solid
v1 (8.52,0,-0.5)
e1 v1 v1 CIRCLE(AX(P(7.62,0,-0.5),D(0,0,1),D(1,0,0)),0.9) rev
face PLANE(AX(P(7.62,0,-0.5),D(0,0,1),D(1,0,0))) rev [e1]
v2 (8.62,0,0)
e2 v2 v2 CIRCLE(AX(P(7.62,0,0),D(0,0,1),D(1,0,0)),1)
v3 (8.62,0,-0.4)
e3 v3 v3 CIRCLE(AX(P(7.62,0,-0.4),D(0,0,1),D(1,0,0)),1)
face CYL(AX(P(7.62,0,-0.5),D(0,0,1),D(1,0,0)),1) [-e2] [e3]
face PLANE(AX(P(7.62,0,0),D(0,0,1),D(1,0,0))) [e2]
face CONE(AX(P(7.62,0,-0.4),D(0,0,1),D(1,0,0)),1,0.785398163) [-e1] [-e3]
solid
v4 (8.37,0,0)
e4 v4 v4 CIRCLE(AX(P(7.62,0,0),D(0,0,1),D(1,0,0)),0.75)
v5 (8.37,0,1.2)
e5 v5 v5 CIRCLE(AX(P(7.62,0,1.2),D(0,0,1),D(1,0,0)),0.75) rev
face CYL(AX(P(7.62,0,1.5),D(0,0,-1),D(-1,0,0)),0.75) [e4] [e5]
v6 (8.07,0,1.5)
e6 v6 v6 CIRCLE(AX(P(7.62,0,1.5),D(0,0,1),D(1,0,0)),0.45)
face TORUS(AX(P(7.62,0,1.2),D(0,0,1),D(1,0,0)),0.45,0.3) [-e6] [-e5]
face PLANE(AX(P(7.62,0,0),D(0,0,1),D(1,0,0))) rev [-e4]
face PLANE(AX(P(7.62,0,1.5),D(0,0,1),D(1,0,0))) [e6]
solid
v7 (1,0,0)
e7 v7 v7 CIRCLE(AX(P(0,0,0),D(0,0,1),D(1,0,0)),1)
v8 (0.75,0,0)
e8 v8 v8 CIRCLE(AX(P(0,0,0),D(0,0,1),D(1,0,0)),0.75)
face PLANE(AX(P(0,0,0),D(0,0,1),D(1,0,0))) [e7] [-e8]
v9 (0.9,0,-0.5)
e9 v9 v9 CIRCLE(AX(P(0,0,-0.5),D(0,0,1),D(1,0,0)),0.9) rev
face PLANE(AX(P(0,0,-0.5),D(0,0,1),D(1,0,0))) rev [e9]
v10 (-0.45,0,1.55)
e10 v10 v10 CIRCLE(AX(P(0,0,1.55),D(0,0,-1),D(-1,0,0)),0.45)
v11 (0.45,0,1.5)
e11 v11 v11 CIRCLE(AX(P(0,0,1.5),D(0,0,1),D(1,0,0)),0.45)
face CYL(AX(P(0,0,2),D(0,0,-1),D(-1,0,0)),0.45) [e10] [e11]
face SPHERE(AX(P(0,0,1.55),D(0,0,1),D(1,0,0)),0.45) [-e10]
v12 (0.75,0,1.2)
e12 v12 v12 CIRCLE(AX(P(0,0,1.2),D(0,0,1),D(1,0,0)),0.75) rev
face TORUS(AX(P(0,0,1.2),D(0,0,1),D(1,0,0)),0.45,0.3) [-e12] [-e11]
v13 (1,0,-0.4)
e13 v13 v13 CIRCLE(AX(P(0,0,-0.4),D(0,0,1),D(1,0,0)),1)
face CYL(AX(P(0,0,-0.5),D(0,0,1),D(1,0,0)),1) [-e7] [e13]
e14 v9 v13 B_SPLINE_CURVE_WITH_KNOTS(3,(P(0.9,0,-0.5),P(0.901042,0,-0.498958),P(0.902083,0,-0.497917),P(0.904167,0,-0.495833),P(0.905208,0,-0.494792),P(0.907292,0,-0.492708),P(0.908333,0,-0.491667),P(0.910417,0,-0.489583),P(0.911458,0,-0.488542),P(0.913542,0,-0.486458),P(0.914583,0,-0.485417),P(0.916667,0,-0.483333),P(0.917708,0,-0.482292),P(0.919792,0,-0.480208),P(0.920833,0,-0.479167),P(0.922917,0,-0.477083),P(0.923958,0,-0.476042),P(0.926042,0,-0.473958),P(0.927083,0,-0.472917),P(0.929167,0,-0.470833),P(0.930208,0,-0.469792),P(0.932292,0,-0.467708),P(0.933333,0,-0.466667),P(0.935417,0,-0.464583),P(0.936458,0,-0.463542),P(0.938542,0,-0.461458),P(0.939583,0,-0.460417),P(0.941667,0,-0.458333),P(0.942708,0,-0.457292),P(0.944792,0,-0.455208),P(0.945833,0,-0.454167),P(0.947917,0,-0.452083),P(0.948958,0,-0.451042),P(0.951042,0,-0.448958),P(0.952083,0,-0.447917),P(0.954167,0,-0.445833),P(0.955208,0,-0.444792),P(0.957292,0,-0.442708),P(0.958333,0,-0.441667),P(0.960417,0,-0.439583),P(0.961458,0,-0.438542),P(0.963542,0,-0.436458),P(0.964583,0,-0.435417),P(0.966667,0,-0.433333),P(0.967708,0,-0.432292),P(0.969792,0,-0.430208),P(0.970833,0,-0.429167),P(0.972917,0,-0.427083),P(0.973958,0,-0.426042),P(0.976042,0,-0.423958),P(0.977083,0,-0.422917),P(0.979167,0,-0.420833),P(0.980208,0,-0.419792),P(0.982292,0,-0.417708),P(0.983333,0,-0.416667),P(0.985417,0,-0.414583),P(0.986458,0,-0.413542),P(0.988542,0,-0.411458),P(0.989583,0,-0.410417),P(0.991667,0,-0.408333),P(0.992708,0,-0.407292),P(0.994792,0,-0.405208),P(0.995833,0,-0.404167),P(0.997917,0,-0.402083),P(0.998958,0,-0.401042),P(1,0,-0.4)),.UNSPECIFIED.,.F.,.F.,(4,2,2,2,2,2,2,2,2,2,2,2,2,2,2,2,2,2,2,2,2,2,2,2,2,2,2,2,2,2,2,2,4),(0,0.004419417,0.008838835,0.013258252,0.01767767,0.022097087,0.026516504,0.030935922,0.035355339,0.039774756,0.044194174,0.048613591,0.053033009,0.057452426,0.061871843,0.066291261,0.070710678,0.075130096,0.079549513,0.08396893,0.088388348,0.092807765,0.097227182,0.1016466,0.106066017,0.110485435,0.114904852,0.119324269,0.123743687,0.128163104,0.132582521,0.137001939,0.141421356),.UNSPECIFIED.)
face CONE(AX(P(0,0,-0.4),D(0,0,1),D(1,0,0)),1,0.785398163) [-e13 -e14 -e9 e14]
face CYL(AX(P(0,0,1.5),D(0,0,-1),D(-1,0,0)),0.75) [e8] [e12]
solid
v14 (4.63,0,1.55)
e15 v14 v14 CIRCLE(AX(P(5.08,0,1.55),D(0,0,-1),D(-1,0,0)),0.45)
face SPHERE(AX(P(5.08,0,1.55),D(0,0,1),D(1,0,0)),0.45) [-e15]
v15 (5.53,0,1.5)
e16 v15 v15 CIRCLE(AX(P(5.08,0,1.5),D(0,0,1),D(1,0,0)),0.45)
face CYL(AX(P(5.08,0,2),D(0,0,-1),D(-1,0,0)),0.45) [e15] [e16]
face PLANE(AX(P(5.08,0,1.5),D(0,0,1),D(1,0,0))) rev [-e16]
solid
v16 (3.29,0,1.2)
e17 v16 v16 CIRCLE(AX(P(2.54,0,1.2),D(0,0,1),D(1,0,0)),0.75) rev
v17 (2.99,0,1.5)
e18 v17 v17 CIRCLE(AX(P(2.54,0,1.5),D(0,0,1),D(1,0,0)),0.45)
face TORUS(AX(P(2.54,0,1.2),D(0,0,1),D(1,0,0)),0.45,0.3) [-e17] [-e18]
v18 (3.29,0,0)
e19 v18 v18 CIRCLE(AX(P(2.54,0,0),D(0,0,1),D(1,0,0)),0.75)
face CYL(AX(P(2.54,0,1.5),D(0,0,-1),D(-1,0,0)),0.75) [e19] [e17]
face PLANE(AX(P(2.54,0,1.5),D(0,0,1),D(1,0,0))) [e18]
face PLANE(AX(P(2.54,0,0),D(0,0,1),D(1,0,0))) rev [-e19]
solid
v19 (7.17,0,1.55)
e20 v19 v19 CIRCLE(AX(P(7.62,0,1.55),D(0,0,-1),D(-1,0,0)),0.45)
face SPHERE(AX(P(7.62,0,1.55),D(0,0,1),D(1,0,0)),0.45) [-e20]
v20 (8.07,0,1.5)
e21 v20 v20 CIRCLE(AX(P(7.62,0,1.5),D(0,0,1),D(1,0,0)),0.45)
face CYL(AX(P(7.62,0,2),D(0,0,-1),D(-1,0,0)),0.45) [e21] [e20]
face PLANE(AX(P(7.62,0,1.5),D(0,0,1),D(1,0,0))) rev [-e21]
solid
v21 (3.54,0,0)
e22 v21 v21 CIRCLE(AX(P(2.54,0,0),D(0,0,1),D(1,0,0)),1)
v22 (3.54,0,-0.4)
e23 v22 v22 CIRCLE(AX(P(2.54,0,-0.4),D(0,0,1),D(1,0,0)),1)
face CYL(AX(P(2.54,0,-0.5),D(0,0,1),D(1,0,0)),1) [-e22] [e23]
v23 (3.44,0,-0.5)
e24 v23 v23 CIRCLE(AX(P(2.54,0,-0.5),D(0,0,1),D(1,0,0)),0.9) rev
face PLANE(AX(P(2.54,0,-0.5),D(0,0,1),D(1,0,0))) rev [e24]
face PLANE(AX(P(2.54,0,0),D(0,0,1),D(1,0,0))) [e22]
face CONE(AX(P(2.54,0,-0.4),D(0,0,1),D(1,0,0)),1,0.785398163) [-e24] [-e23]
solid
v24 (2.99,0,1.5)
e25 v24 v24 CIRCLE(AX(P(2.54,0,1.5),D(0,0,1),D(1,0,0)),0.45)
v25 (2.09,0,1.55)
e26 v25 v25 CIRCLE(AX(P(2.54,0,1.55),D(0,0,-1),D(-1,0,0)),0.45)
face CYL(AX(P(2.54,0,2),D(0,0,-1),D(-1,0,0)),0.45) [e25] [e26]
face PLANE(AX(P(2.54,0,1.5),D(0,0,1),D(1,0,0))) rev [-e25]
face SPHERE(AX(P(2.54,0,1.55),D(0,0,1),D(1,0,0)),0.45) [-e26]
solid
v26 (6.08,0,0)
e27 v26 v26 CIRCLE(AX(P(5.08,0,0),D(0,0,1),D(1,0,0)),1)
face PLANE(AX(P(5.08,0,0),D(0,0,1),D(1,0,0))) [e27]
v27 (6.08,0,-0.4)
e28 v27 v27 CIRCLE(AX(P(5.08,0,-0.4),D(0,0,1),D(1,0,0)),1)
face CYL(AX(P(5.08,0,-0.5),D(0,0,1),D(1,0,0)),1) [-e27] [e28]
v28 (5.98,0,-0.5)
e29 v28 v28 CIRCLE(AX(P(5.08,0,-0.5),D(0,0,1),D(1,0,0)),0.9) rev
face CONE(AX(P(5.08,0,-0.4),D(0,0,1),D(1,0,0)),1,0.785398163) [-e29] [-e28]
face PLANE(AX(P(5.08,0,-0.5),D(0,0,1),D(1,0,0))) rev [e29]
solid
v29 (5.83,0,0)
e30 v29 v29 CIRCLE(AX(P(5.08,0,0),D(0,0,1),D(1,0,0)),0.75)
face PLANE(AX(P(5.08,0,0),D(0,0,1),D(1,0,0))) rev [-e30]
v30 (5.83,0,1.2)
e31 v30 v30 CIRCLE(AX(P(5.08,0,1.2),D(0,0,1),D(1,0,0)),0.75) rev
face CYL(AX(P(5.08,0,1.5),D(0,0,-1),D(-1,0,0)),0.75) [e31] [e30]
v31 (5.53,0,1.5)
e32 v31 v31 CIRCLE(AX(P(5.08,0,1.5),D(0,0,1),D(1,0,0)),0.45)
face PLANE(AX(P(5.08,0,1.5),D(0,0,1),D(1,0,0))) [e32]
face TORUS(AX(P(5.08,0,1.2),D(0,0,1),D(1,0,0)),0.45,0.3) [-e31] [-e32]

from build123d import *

# Parameters (mm, degrees)
SKETCH_1_R        = 0.75
EXTRUDE_1_DEPTH   = 1.5
EXTRUDE_1_2_DEPTH = 1.5
EXTRUDE_1_3_DEPTH = 1.5
EXTRUDE_1_4_DEPTH = 1.5
SKETCH_2_R        = 1
EXTRUDE_2_DEPTH   = 0.5
SKETCH_3_R        = 0.45
EXTRUDE_3_DEPTH   = 0.5
FILLET_1_R        = 0.3
FILLET_2_R        = 0.45
CHAMFER_1_SIZE    = 0.1
CHAMFER_2_SIZE    = 0.1
CHAMFER_3_SIZE    = 0.1
CHAMFER_4_SIZE    = 0.1
FILLET_3_R        = 0.3
FILLET_4_R        = 0.3
FILLET_5_R        = 0.3
FILLET_6_R        = 0.45
FILLET_7_R        = 0.45
FILLET_8_R        = 0.45


with BuildPart() as part:
    # 草图1 → 凸台-拉伸1 (new body)
    with BuildSketch(Plane.XY):
        Circle(SKETCH_1_R)
    extrude(amount=EXTRUDE_1_DEPTH)

    # 草图2 → 凸台-拉伸2 (add)
    with BuildSketch(Plane.XY):
        Circle(SKETCH_2_R)
        with Locations((2.54, 0)):
            Circle(SKETCH_2_R)
        with Locations((5.08, 0)):
            Circle(SKETCH_2_R)
        with Locations((7.62, 0)):
            Circle(SKETCH_2_R)
    extrude(amount=-EXTRUDE_2_DEPTH)


with BuildPart() as body_2:
    # 草图1 → Extrude 1 2 (new body)
    with BuildSketch(Plane.XY):
        with Locations((2.54, 0)):
            Circle(SKETCH_1_R)
    extrude(amount=EXTRUDE_1_2_DEPTH)

    # 圆角3
    fillet_3_edges = [body_2.edges().sort_by_distance(p)[0] for p in [
        (1.79, 0, 1.5),
    ]]
    fillet(fillet_3_edges, radius=FILLET_3_R)


with BuildPart() as body_3:
    # 草图1 → Extrude 1 3 (new body)
    with BuildSketch(Plane.XY):
        with Locations((5.08, 0)):
            Circle(SKETCH_1_R)
    extrude(amount=EXTRUDE_1_3_DEPTH)

    # 圆角4
    fillet_4_edges = [body_3.edges().sort_by_distance(p)[0] for p in [
        (4.33, 0, 1.5),
    ]]
    fillet(fillet_4_edges, radius=FILLET_4_R)


with BuildPart() as body_4:
    # 草图1 → Extrude 1 4 (new body)
    with BuildSketch(Plane.XY):
        with Locations((7.62, 0)):
            Circle(SKETCH_1_R)
    extrude(amount=EXTRUDE_1_4_DEPTH)

    # 圆角5
    fillet_5_edges = [body_4.edges().sort_by_distance(p)[0] for p in [
        (6.87, 0, 1.5),
    ]]
    fillet(fillet_5_edges, radius=FILLET_5_R)


with BuildPart() as extrude_2_piece_1:
    # of the separate pieces the step leaves, piece 1, a body of its own (extrude_2_pieces)
    add(part.part.solids().sort_by_distance((1, 0, 0))[0])

    # 草图3 → 凸台-拉伸3 (add)
    with BuildSketch(Plane.XY.offset(1.5)):
        Circle(SKETCH_3_R)
        with Locations((2.54, 0)):
            Circle(SKETCH_3_R)
        with Locations((5.08, 0)):
            Circle(SKETCH_3_R)
        with Locations((7.62, 0)):
            Circle(SKETCH_3_R)
    extrude(amount=EXTRUDE_3_DEPTH)


with BuildPart() as extrude_2_piece_2:
    # of the separate pieces the step leaves, piece 2, a body of its own (extrude_2_pieces)
    add(part.part.solids().sort_by_distance((3.54, 0, 0))[0])

    # 倒角1
    chamfer_1_edges = [extrude_2_piece_2.edges().sort_by_distance(p)[0] for p in [
        (1.54, 0, -0.5),
    ]]
    chamfer(chamfer_1_edges, length=CHAMFER_1_SIZE)


with BuildPart() as extrude_2_piece_3:
    # of the separate pieces the step leaves, piece 3, a body of its own (extrude_2_pieces)
    add(part.part.solids().sort_by_distance((6.08, 0, 0))[0])

    # 倒角3
    chamfer_3_edges = [extrude_2_piece_3.edges().sort_by_distance(p)[0] for p in [
        (4.08, 0, -0.5),
    ]]
    chamfer(chamfer_3_edges, length=CHAMFER_3_SIZE)


with BuildPart() as extrude_2_piece_4:
    # of the separate pieces the step leaves, piece 4, a body of its own (extrude_2_pieces)
    add(part.part.solids().sort_by_distance((8.62, 0, 0))[0])

    # 倒角4
    chamfer_4_edges = [extrude_2_piece_4.edges().sort_by_distance(p)[0] for p in [
        (6.62, 0, -0.5),
    ]]
    chamfer(chamfer_4_edges, length=CHAMFER_4_SIZE)


with BuildPart() as extrude_3_piece_1:
    # of the separate pieces the step leaves, piece 1, a body of its own (extrude_3_pieces)
    add(extrude_2_piece_1.part.solids().sort_by_distance((1, 0, 0))[0])

    # 圆角1
    fillet_1_edges = [extrude_3_piece_1.edges().sort_by_distance(p)[0] for p in [
        (-0.75, 0, 1.5),
    ]]
    fillet(fillet_1_edges, radius=FILLET_1_R - 0.0001)  # a hair under: the kernel refuses the full size

    # 圆角2
    fillet_2_edges = [extrude_3_piece_1.edges().sort_by_distance(p)[0] for p in [
        (-0.45, 0, 2),
    ]]
    fillet(fillet_2_edges, radius=FILLET_2_R)

    # 倒角2
    chamfer_2_edges = [extrude_3_piece_1.edges().sort_by_distance(p)[0] for p in [
        (-1, 0, -0.5),
    ]]
    chamfer(chamfer_2_edges, length=CHAMFER_2_SIZE)


with BuildPart() as extrude_3_piece_2:
    # of the separate pieces the step leaves, piece 2, a body of its own (extrude_3_pieces)
    add(extrude_2_piece_1.part.solids().sort_by_distance((2.99, 0, 1.5))[0])

    # 圆角6
    fillet_6_edges = [extrude_3_piece_2.edges().sort_by_distance(p)[0] for p in [
        (2.09, 0, 2),
    ]]
    fillet(fillet_6_edges, radius=FILLET_6_R)


with BuildPart() as extrude_3_piece_3:
    # of the separate pieces the step leaves, piece 3, a body of its own (extrude_3_pieces)
    add(extrude_2_piece_1.part.solids().sort_by_distance((5.53, 0, 1.5))[0])

    # 圆角7
    fillet_7_edges = [extrude_3_piece_3.edges().sort_by_distance(p)[0] for p in [
        (4.63, 0, 2),
    ]]
    fillet(fillet_7_edges, radius=FILLET_7_R)


with BuildPart() as extrude_3_piece_4:
    # of the separate pieces the step leaves, piece 4, a body of its own (extrude_3_pieces)
    add(extrude_2_piece_1.part.solids().sort_by_distance((8.07, 0, 1.5))[0])

    # 圆角8
    fillet_8_edges = [extrude_3_piece_4.edges().sort_by_distance(p)[0] for p in [
        (7.17, 0, 2),
    ]]
    fillet(fillet_8_edges, radius=FILLET_8_R)


solid = Compound([body_2.part, body_3.part, body_4.part, extrude_2_piece_2.part, extrude_2_piece_3.part, extrude_2_piece_4.part, extrude_3_piece_1.part, extrude_3_piece_2.part, extrude_3_piece_3.part, extrude_3_piece_4.part])
